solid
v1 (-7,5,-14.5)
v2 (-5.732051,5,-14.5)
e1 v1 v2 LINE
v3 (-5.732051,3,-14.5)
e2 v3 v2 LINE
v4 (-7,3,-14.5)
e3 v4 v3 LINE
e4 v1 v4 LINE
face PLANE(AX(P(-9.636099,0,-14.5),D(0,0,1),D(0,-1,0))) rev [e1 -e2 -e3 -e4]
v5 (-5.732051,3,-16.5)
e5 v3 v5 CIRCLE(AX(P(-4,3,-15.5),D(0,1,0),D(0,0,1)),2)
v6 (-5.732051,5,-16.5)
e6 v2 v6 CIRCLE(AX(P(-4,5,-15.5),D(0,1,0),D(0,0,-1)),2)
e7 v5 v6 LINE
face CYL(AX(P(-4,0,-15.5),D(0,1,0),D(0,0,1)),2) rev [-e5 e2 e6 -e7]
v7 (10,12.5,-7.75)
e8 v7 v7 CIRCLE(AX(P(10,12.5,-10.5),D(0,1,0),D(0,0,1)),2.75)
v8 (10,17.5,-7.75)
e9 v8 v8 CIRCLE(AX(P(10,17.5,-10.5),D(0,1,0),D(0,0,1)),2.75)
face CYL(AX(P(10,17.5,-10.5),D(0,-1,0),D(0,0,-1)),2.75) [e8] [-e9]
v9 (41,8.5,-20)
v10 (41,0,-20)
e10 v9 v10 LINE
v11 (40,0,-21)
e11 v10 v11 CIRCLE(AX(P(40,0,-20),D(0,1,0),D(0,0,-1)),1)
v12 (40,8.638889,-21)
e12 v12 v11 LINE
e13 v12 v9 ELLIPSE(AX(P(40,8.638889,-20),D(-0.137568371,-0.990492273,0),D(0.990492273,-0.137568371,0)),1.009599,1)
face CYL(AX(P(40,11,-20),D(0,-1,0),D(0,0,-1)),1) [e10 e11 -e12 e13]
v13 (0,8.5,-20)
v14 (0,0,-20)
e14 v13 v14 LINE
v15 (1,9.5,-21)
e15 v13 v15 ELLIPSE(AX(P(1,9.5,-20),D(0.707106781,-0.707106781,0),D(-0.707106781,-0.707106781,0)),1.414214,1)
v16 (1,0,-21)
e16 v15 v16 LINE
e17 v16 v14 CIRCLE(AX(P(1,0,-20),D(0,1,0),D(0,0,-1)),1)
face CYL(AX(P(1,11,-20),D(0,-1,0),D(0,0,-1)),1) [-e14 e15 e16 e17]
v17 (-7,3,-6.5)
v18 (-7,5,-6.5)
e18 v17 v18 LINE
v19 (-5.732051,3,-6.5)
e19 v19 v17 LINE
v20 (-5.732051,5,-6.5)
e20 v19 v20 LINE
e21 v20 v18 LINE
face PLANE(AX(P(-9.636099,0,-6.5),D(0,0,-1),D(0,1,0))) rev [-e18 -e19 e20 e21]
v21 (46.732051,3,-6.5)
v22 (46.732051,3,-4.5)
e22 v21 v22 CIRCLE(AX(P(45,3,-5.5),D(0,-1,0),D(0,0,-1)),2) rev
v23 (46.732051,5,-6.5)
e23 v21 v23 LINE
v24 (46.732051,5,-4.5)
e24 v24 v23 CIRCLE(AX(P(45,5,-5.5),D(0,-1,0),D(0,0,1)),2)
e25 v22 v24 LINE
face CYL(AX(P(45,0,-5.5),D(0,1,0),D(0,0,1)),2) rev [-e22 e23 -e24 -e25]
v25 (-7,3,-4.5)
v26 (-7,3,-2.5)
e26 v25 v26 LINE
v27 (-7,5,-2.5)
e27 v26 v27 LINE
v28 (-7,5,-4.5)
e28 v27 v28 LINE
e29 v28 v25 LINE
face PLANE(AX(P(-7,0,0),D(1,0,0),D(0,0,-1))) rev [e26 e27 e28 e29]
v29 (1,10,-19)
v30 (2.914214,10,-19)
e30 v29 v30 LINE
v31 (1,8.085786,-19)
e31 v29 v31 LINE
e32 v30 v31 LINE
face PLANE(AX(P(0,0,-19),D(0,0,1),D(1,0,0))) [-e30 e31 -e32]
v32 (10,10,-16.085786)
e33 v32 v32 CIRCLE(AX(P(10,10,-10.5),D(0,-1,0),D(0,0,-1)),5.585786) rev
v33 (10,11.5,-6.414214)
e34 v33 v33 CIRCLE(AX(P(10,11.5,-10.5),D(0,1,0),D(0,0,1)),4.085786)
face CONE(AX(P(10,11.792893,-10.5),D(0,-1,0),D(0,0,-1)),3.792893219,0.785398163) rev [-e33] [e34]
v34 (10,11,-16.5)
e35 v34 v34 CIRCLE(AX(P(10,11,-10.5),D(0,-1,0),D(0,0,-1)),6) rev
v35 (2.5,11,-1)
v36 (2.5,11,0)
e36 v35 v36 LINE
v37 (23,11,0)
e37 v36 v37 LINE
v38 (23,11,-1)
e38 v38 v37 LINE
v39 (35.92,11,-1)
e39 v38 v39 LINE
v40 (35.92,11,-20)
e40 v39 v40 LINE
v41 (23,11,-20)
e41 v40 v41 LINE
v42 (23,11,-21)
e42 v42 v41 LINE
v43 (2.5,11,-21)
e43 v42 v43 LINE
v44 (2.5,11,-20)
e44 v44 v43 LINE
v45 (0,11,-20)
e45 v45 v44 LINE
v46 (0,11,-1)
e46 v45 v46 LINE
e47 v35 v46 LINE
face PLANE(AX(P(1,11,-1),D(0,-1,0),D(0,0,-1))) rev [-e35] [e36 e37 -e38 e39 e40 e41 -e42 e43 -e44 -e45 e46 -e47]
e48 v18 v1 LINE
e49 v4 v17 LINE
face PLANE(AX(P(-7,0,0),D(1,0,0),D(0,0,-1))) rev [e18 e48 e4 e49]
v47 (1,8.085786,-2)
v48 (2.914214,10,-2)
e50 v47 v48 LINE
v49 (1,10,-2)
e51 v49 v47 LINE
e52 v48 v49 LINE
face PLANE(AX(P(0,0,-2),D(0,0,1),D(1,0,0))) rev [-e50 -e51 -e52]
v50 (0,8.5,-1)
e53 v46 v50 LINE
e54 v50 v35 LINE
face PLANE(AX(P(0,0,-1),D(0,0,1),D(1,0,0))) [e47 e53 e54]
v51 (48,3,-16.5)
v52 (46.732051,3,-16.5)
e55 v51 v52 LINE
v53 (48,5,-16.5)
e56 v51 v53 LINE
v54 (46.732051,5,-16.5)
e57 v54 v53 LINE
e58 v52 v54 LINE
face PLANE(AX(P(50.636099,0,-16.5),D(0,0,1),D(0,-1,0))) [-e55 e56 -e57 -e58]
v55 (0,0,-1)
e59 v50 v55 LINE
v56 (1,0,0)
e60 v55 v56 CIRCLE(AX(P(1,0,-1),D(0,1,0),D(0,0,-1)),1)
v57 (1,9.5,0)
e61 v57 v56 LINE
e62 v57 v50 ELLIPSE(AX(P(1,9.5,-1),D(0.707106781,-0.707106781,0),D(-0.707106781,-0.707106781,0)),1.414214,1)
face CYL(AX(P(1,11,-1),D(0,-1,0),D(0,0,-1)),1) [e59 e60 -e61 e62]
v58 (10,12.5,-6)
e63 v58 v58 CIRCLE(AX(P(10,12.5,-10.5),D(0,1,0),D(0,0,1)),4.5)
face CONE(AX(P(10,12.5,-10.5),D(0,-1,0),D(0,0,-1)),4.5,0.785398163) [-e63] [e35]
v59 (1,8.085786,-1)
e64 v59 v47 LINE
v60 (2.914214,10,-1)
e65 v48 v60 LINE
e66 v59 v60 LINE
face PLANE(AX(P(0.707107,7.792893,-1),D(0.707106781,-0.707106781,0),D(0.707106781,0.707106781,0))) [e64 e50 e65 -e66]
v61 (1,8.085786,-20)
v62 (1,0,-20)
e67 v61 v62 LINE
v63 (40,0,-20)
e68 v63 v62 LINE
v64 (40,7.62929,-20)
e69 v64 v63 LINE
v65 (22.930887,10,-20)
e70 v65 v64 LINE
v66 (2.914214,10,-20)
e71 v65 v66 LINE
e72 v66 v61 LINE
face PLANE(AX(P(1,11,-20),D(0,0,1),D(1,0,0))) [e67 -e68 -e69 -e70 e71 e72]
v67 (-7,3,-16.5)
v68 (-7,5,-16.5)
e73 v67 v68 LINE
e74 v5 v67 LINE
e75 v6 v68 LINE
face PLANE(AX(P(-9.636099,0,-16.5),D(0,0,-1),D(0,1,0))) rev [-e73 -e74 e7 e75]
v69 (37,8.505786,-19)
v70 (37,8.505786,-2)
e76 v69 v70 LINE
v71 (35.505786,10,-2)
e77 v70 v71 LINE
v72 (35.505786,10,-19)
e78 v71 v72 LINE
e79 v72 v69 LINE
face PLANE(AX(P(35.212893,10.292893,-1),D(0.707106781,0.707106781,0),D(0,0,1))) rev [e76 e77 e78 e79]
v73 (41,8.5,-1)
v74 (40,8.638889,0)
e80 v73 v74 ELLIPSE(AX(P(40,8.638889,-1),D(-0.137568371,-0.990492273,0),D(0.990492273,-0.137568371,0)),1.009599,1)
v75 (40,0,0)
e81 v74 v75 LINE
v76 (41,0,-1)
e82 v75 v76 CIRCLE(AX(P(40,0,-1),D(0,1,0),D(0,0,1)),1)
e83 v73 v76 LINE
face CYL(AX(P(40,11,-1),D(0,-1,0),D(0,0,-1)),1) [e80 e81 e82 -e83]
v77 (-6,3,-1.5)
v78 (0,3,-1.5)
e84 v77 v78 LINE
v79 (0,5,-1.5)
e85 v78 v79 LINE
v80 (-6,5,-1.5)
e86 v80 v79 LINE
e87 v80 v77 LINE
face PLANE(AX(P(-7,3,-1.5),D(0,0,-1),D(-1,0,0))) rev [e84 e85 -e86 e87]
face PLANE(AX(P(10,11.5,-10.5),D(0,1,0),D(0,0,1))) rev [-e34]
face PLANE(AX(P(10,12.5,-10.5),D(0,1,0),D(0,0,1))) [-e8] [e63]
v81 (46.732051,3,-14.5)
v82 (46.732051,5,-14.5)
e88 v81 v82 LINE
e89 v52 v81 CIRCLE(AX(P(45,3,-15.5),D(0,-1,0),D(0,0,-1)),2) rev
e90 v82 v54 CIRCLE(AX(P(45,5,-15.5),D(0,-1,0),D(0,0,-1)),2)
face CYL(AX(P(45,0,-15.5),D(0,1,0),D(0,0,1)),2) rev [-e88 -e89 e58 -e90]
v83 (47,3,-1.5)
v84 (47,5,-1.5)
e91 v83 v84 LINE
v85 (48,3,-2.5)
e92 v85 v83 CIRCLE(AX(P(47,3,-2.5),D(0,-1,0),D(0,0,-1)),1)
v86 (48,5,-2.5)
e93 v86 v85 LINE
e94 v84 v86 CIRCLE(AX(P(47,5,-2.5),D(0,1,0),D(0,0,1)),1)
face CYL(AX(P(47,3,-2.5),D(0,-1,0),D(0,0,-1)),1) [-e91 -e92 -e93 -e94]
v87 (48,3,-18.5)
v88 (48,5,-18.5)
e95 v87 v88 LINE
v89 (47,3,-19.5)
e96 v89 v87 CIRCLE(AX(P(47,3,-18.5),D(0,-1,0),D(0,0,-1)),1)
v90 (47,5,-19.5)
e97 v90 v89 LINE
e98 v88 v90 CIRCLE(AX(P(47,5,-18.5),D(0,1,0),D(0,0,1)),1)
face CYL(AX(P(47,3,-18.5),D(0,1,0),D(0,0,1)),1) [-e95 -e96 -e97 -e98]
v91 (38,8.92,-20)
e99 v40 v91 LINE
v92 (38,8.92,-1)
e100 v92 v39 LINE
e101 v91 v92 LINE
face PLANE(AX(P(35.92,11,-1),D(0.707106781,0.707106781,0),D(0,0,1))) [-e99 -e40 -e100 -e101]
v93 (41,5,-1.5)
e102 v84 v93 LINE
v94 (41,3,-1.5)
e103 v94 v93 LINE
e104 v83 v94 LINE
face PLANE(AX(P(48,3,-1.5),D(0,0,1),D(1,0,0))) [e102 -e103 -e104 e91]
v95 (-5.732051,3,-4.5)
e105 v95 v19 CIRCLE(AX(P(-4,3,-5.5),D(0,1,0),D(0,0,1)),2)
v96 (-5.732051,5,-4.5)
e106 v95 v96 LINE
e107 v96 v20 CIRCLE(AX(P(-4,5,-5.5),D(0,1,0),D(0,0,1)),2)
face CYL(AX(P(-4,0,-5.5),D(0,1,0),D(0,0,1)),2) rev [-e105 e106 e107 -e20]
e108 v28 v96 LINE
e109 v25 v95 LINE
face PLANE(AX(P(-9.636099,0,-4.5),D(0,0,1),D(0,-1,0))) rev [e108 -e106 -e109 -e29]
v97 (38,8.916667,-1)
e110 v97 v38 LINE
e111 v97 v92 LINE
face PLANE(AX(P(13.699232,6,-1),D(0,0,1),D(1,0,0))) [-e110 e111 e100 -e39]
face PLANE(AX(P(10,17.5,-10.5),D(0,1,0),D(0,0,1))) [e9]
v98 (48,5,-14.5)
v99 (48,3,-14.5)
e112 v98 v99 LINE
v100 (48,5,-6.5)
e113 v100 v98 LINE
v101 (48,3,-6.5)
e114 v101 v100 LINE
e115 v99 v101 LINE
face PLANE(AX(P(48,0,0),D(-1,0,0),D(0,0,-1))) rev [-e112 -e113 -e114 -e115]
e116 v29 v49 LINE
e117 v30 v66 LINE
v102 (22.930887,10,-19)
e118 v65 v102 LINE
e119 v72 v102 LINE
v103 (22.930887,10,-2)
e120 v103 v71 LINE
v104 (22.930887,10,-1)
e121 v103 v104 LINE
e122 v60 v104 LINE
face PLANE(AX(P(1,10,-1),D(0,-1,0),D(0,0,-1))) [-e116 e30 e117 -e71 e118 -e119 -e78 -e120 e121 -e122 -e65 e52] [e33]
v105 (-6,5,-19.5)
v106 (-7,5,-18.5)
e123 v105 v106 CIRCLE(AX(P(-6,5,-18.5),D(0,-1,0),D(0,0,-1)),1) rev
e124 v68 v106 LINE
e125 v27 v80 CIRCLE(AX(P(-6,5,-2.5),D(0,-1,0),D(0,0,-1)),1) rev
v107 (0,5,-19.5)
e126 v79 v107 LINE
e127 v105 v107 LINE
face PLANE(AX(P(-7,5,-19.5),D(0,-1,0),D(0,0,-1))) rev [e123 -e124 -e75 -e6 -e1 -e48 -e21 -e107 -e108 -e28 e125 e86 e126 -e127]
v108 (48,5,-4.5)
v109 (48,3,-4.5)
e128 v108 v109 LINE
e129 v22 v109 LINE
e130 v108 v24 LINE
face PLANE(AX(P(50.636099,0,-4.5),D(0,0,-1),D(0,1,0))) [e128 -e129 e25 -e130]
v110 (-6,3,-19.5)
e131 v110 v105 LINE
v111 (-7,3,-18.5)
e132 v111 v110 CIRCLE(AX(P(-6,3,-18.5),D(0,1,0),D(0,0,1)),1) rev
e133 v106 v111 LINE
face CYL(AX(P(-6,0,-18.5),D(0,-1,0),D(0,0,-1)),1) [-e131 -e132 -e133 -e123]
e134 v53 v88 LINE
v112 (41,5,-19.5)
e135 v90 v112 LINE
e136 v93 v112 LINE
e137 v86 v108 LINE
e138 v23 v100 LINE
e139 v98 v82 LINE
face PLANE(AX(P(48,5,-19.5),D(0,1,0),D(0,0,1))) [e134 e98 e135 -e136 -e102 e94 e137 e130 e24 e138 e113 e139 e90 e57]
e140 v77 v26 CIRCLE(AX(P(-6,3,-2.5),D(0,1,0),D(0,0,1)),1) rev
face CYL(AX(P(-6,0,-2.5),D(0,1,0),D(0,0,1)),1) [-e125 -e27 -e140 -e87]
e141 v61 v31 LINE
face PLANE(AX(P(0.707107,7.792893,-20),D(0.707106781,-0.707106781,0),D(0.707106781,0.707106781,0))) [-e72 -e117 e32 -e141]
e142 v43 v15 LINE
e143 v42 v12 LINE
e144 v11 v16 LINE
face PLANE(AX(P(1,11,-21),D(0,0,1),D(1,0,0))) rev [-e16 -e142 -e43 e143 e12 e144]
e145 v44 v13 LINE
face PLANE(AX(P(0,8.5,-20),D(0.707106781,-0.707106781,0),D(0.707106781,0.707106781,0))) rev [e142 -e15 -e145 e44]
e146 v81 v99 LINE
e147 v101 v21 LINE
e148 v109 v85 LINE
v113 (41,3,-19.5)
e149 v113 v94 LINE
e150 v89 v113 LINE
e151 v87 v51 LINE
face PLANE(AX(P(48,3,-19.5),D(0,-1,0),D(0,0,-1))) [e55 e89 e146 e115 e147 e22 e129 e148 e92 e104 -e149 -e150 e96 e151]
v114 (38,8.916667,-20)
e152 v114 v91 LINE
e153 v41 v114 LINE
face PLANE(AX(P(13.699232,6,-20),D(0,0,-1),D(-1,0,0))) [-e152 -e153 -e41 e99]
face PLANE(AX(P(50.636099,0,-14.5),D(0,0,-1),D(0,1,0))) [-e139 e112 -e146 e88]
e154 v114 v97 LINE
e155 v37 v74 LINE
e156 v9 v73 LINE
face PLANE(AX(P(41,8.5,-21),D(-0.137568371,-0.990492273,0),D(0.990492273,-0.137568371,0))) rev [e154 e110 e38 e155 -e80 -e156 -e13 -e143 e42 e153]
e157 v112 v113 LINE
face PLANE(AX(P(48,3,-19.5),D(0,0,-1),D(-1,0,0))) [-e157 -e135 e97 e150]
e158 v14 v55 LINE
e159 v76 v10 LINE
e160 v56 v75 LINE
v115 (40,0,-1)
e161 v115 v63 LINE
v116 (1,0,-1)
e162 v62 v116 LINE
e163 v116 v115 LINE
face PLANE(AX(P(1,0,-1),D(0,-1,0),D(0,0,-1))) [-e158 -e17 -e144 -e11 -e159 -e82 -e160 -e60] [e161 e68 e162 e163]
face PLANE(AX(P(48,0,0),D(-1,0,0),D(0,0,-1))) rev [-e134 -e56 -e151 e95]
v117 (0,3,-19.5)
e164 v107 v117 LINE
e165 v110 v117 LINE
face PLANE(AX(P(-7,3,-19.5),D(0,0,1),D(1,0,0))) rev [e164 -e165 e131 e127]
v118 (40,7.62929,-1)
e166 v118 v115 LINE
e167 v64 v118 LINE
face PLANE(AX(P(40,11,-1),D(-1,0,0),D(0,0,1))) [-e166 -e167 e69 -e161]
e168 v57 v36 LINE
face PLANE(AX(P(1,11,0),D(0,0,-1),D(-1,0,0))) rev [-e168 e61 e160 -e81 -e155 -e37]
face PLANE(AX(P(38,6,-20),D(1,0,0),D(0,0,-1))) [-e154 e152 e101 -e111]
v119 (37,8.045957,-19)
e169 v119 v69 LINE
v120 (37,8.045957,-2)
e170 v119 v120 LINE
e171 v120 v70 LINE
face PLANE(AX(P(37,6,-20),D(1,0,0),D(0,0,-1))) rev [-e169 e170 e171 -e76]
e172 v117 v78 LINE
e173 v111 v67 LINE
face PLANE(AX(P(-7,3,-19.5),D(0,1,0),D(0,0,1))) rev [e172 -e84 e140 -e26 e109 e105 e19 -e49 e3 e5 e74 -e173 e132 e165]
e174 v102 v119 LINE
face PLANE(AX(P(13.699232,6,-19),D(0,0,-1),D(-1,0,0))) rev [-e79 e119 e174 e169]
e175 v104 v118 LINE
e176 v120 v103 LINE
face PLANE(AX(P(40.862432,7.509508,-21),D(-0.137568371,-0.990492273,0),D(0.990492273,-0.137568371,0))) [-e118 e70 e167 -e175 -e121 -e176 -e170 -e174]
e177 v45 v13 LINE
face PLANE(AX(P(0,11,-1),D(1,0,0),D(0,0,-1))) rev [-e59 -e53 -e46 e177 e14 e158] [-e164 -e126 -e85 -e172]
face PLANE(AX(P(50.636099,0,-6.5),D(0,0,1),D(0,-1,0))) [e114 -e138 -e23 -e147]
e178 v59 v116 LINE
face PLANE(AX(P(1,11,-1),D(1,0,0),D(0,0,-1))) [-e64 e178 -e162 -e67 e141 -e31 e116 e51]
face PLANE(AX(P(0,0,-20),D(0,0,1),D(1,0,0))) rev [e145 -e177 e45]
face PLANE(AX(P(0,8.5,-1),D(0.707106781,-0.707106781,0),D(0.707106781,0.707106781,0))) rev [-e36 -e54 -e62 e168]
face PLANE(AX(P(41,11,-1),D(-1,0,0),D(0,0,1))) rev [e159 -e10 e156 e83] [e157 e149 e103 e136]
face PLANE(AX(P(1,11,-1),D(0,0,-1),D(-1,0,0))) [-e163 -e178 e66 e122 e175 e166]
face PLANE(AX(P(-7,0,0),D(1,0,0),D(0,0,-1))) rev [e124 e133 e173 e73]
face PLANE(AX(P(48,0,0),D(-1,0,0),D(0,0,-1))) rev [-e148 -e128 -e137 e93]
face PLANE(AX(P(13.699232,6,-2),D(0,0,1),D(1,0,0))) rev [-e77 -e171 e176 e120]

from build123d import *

# Parameters (mm, degrees)
BOSS_EXTRU_1_DEPTH      = 11
ENL_V_MAT_EXTRU_1_DEPTH = 48.360320945
ESQUISSE6_W             = 24.300768243
ESQUISSE6_H             = 19
BOSS_EXTRU_2_DEPTH      = 5
CHANFREIN1_SIZE         = 2.08
ESQUISSE7_R             = 6
BOSS_EXTRU_3_DEPTH      = 1.5
CHANFREIN2_SIZE         = 1.5
ENL_V_MAT_EXTRU_2_DEPTH = 1
ENL_V_MAT_EXTRU_3_DEPTH = 1
ESQUISSE11_W            = 18
ESQUISSE11_H            = 2
BOSS_EXTRU_4_DEPTH      = 7
ENL_V_MAT_EXTRU_5_DEPTH = 47.671725916
CONG_1_R                = 1
CONG_1_OF_SYM_TRIE1_R   = 1
COQUE1_START            = -20
COQUE1_DEPTH            = 19
COQUE1_START_2          = -19
COQUE1_2_DEPTH          = 17
ESQUISSE18_R            = 2.75
BOSS_EXTRU_5_DEPTH      = 5


with BuildPart() as part:
    # Esquisse3 → Boss.-Extru.1 (new body)
    with BuildSketch(Plane(origin=(0, 0, 0), x_dir=(1, 0, 0), z_dir=(0, 1, 0))):
        with BuildLine():
            Line((1, 0), (40, 0))
            ThreePointArc((40, 0), (40.707106781, 0.292893219), (41, 1))
            Line((41, 1), (41, 20))
            ThreePointArc((41, 20), (40.707106781, 20.707106781), (40, 21))
            Line((40, 21), (1, 21))
            ThreePointArc((1, 21), (0.292893219, 20.707106781), (0, 20))
            Line((0, 20), (0, 1))
            ThreePointArc((0, 1), (0.292893219, 0.292893219), (1, 0))
        make_face()
    extrude(amount=BOSS_EXTRU_1_DEPTH)

    # Esquisse4 → Enlèv. mat.-Extru.1 (cut, through all)
    with BuildSketch(Plane.XY):
        Polygon((41, 11), (23, 11), (41, 8.5), align=None)
    extrude(amount=-ENL_V_MAT_EXTRU_1_DEPTH, mode=Mode.SUBTRACT)

    # Esquisse6 → Boss.-Extru.2 (add)
    with BuildSketch(Plane(origin=(0, 11, 0), x_dir=(1, 0, 0), z_dir=(0, 1, 0))):
        with Locations((25.849615878, 10.5)):
            Rectangle(ESQUISSE6_W, ESQUISSE6_H)
    extrude(amount=-BOSS_EXTRU_2_DEPTH)

    # Chanfrein1
    chanfrein1_edges = [part.edges().sort_by_distance(p)[0] for p in [
        (38, 11, -10.5),
    ]]
    chamfer(chanfrein1_edges, length=CHANFREIN1_SIZE)

    # Esquisse7 → Boss.-Extru.3 (add)
    with BuildSketch(Plane(origin=(0, 11, 0), x_dir=(1, 0, 0), z_dir=(0, 1, 0))):
        with Locations(Location((10, 10.5, 0), (0, 0, 90))):
            Circle(ESQUISSE7_R)
    extrude(amount=BOSS_EXTRU_3_DEPTH)

    # Chanfrein2
    chanfrein2_edges = [part.edges().sort_by_distance(p)[0] for p in [
        (10, 12.5, -4.5),
    ]]
    chamfer(chanfrein2_edges, length=CHANFREIN2_SIZE - 0.0001)  # a hair under: the kernel refuses the full size

    # Esquisse8 → Enlèv. mat.-Extru.2 (cut)
    with BuildSketch(Plane.XY):
        Polygon((0, 11), (2.5, 11), (0, 8.5), align=None)
    extrude(amount=-ENL_V_MAT_EXTRU_2_DEPTH, mode=Mode.SUBTRACT)

    # Esquisse9 → Enlèv. mat.-Extru.3 (cut)
    with BuildSketch(Plane(origin=(0, 0, -21), x_dir=(-1, 0, 0), z_dir=(0, 0, -1))):
        Polygon((0, 11), (-2.5, 11), (0, 8.5), align=None)
    extrude(amount=-ENL_V_MAT_EXTRU_3_DEPTH, mode=Mode.SUBTRACT)

    # Esquisse11 → Boss.-Extru.4 (add)
    with BuildSketch(Plane.ZY):
        with Locations((-10.5, 4)):
            Rectangle(ESQUISSE11_W, ESQUISSE11_H)
    boss_extru_4 = extrude(amount=BOSS_EXTRU_4_DEPTH)

    # Esquisse15 → Enlèv. mat.-Extru.5 (cut, through all)
    with BuildSketch(Plane(origin=(0, 5, 0), x_dir=(1, 0, 0), z_dir=(0, 1, 0))):
        with BuildLine():
            Line((-9.636099445, 16.5), (-5.732050808, 16.5))
            ThreePointArc((-5.732050808, 16.5), (-2, 15.5), (-5.732050808, 14.5))
            Line((-5.732050808, 14.5), (-9.636099445, 14.5))
            Line((-9.636099445, 14.5), (-9.636099445, 16.5))
        make_face()
        with BuildLine():
            Line((-9.636099445, 4.5), (-5.732050808, 4.5))
            ThreePointArc((-5.732050808, 4.5), (-2, 5.5), (-5.732050808, 6.5))
            Line((-5.732050808, 6.5), (-9.636099445, 6.5))
            Line((-9.636099445, 6.5), (-9.636099445, 4.5))
        make_face()
    enl_v_mat_extru_5 = extrude(amount=-ENL_V_MAT_EXTRU_5_DEPTH, mode=Mode.SUBTRACT)

    # Congé1
    cong_1_edges = [part.edges().sort_by_distance(p)[0] for p in [
        (-7, 4, -19.5),
        (-7, 4, -1.5),
    ]]
    fillet(cong_1_edges, radius=CONG_1_R)

    # Symétrie1: Boss.-Extru.4, Enlèv. mat.-Extru.5 across plane
    add(boss_extru_4.mirror(Plane.ZY.offset(-20.5)))
    add(enl_v_mat_extru_5.mirror(Plane.ZY.offset(-20.5)), mode=Mode.SUBTRACT)

    # Congé1 of Symétrie1
    cong_1_of_sym_trie1_edges = [part.edges().sort_by_distance(p)[0] for p in [
        (48, 4, -19.5),
        (48, 4, -1.5),
    ]]
    fillet(cong_1_of_sym_trie1_edges, radius=CONG_1_OF_SYM_TRIE1_R)

    # Coque1: read off the stored shape, not the designer's step
    # Coque1 outline → Coque1 (cut)
    with BuildSketch(Plane.XY.offset(COQUE1_START)):
        Polygon((1, 8.085786438), (1, 0), (40, 0), (40, 7.629289897), (22.930887262, 10), (2.914213562, 10), align=None)
    extrude(amount=COQUE1_DEPTH, mode=Mode.SUBTRACT)

    # Coque1 2 outline → Coque1 2 (cut)
    with BuildSketch(Plane.XY.offset(COQUE1_START_2)):
        Polygon((1, 10), (1, 8.085786438), (2.914213562, 10), align=None)
        Polygon((35.505786438, 10), (22.930887262, 10), (37, 8.045956564), (37, 8.505786438), align=None)
    extrude(amount=COQUE1_2_DEPTH, mode=Mode.SUBTRACT)

    # Coque1 3 outline → Coque1 3 (revolve, cut)
    with BuildSketch(Plane(origin=(10, 0, -10.5), x_dir=(1, 0, 0), z_dir=(0, 0, 1))):
        Polygon((4.085786438, 11.5), (0, 11.5), (0, 10), (5.585786438, 10), align=None)
    revolve(axis=Axis((10, 0, -10.5), (0, 1, 0)), mode=Mode.SUBTRACT)

    # Esquisse18 → Boss.-Extru.5 (add)
    with BuildSketch(Plane(origin=(0, 12.5, 0), x_dir=(1, 0, 0), z_dir=(0, 1, 0))):
        with Locations(Location((10, 10.5, 0), (0, 0, 270))):
            Circle(ESQUISSE18_R)
    extrude(amount=BOSS_EXTRU_5_DEPTH)


solid = part.part
